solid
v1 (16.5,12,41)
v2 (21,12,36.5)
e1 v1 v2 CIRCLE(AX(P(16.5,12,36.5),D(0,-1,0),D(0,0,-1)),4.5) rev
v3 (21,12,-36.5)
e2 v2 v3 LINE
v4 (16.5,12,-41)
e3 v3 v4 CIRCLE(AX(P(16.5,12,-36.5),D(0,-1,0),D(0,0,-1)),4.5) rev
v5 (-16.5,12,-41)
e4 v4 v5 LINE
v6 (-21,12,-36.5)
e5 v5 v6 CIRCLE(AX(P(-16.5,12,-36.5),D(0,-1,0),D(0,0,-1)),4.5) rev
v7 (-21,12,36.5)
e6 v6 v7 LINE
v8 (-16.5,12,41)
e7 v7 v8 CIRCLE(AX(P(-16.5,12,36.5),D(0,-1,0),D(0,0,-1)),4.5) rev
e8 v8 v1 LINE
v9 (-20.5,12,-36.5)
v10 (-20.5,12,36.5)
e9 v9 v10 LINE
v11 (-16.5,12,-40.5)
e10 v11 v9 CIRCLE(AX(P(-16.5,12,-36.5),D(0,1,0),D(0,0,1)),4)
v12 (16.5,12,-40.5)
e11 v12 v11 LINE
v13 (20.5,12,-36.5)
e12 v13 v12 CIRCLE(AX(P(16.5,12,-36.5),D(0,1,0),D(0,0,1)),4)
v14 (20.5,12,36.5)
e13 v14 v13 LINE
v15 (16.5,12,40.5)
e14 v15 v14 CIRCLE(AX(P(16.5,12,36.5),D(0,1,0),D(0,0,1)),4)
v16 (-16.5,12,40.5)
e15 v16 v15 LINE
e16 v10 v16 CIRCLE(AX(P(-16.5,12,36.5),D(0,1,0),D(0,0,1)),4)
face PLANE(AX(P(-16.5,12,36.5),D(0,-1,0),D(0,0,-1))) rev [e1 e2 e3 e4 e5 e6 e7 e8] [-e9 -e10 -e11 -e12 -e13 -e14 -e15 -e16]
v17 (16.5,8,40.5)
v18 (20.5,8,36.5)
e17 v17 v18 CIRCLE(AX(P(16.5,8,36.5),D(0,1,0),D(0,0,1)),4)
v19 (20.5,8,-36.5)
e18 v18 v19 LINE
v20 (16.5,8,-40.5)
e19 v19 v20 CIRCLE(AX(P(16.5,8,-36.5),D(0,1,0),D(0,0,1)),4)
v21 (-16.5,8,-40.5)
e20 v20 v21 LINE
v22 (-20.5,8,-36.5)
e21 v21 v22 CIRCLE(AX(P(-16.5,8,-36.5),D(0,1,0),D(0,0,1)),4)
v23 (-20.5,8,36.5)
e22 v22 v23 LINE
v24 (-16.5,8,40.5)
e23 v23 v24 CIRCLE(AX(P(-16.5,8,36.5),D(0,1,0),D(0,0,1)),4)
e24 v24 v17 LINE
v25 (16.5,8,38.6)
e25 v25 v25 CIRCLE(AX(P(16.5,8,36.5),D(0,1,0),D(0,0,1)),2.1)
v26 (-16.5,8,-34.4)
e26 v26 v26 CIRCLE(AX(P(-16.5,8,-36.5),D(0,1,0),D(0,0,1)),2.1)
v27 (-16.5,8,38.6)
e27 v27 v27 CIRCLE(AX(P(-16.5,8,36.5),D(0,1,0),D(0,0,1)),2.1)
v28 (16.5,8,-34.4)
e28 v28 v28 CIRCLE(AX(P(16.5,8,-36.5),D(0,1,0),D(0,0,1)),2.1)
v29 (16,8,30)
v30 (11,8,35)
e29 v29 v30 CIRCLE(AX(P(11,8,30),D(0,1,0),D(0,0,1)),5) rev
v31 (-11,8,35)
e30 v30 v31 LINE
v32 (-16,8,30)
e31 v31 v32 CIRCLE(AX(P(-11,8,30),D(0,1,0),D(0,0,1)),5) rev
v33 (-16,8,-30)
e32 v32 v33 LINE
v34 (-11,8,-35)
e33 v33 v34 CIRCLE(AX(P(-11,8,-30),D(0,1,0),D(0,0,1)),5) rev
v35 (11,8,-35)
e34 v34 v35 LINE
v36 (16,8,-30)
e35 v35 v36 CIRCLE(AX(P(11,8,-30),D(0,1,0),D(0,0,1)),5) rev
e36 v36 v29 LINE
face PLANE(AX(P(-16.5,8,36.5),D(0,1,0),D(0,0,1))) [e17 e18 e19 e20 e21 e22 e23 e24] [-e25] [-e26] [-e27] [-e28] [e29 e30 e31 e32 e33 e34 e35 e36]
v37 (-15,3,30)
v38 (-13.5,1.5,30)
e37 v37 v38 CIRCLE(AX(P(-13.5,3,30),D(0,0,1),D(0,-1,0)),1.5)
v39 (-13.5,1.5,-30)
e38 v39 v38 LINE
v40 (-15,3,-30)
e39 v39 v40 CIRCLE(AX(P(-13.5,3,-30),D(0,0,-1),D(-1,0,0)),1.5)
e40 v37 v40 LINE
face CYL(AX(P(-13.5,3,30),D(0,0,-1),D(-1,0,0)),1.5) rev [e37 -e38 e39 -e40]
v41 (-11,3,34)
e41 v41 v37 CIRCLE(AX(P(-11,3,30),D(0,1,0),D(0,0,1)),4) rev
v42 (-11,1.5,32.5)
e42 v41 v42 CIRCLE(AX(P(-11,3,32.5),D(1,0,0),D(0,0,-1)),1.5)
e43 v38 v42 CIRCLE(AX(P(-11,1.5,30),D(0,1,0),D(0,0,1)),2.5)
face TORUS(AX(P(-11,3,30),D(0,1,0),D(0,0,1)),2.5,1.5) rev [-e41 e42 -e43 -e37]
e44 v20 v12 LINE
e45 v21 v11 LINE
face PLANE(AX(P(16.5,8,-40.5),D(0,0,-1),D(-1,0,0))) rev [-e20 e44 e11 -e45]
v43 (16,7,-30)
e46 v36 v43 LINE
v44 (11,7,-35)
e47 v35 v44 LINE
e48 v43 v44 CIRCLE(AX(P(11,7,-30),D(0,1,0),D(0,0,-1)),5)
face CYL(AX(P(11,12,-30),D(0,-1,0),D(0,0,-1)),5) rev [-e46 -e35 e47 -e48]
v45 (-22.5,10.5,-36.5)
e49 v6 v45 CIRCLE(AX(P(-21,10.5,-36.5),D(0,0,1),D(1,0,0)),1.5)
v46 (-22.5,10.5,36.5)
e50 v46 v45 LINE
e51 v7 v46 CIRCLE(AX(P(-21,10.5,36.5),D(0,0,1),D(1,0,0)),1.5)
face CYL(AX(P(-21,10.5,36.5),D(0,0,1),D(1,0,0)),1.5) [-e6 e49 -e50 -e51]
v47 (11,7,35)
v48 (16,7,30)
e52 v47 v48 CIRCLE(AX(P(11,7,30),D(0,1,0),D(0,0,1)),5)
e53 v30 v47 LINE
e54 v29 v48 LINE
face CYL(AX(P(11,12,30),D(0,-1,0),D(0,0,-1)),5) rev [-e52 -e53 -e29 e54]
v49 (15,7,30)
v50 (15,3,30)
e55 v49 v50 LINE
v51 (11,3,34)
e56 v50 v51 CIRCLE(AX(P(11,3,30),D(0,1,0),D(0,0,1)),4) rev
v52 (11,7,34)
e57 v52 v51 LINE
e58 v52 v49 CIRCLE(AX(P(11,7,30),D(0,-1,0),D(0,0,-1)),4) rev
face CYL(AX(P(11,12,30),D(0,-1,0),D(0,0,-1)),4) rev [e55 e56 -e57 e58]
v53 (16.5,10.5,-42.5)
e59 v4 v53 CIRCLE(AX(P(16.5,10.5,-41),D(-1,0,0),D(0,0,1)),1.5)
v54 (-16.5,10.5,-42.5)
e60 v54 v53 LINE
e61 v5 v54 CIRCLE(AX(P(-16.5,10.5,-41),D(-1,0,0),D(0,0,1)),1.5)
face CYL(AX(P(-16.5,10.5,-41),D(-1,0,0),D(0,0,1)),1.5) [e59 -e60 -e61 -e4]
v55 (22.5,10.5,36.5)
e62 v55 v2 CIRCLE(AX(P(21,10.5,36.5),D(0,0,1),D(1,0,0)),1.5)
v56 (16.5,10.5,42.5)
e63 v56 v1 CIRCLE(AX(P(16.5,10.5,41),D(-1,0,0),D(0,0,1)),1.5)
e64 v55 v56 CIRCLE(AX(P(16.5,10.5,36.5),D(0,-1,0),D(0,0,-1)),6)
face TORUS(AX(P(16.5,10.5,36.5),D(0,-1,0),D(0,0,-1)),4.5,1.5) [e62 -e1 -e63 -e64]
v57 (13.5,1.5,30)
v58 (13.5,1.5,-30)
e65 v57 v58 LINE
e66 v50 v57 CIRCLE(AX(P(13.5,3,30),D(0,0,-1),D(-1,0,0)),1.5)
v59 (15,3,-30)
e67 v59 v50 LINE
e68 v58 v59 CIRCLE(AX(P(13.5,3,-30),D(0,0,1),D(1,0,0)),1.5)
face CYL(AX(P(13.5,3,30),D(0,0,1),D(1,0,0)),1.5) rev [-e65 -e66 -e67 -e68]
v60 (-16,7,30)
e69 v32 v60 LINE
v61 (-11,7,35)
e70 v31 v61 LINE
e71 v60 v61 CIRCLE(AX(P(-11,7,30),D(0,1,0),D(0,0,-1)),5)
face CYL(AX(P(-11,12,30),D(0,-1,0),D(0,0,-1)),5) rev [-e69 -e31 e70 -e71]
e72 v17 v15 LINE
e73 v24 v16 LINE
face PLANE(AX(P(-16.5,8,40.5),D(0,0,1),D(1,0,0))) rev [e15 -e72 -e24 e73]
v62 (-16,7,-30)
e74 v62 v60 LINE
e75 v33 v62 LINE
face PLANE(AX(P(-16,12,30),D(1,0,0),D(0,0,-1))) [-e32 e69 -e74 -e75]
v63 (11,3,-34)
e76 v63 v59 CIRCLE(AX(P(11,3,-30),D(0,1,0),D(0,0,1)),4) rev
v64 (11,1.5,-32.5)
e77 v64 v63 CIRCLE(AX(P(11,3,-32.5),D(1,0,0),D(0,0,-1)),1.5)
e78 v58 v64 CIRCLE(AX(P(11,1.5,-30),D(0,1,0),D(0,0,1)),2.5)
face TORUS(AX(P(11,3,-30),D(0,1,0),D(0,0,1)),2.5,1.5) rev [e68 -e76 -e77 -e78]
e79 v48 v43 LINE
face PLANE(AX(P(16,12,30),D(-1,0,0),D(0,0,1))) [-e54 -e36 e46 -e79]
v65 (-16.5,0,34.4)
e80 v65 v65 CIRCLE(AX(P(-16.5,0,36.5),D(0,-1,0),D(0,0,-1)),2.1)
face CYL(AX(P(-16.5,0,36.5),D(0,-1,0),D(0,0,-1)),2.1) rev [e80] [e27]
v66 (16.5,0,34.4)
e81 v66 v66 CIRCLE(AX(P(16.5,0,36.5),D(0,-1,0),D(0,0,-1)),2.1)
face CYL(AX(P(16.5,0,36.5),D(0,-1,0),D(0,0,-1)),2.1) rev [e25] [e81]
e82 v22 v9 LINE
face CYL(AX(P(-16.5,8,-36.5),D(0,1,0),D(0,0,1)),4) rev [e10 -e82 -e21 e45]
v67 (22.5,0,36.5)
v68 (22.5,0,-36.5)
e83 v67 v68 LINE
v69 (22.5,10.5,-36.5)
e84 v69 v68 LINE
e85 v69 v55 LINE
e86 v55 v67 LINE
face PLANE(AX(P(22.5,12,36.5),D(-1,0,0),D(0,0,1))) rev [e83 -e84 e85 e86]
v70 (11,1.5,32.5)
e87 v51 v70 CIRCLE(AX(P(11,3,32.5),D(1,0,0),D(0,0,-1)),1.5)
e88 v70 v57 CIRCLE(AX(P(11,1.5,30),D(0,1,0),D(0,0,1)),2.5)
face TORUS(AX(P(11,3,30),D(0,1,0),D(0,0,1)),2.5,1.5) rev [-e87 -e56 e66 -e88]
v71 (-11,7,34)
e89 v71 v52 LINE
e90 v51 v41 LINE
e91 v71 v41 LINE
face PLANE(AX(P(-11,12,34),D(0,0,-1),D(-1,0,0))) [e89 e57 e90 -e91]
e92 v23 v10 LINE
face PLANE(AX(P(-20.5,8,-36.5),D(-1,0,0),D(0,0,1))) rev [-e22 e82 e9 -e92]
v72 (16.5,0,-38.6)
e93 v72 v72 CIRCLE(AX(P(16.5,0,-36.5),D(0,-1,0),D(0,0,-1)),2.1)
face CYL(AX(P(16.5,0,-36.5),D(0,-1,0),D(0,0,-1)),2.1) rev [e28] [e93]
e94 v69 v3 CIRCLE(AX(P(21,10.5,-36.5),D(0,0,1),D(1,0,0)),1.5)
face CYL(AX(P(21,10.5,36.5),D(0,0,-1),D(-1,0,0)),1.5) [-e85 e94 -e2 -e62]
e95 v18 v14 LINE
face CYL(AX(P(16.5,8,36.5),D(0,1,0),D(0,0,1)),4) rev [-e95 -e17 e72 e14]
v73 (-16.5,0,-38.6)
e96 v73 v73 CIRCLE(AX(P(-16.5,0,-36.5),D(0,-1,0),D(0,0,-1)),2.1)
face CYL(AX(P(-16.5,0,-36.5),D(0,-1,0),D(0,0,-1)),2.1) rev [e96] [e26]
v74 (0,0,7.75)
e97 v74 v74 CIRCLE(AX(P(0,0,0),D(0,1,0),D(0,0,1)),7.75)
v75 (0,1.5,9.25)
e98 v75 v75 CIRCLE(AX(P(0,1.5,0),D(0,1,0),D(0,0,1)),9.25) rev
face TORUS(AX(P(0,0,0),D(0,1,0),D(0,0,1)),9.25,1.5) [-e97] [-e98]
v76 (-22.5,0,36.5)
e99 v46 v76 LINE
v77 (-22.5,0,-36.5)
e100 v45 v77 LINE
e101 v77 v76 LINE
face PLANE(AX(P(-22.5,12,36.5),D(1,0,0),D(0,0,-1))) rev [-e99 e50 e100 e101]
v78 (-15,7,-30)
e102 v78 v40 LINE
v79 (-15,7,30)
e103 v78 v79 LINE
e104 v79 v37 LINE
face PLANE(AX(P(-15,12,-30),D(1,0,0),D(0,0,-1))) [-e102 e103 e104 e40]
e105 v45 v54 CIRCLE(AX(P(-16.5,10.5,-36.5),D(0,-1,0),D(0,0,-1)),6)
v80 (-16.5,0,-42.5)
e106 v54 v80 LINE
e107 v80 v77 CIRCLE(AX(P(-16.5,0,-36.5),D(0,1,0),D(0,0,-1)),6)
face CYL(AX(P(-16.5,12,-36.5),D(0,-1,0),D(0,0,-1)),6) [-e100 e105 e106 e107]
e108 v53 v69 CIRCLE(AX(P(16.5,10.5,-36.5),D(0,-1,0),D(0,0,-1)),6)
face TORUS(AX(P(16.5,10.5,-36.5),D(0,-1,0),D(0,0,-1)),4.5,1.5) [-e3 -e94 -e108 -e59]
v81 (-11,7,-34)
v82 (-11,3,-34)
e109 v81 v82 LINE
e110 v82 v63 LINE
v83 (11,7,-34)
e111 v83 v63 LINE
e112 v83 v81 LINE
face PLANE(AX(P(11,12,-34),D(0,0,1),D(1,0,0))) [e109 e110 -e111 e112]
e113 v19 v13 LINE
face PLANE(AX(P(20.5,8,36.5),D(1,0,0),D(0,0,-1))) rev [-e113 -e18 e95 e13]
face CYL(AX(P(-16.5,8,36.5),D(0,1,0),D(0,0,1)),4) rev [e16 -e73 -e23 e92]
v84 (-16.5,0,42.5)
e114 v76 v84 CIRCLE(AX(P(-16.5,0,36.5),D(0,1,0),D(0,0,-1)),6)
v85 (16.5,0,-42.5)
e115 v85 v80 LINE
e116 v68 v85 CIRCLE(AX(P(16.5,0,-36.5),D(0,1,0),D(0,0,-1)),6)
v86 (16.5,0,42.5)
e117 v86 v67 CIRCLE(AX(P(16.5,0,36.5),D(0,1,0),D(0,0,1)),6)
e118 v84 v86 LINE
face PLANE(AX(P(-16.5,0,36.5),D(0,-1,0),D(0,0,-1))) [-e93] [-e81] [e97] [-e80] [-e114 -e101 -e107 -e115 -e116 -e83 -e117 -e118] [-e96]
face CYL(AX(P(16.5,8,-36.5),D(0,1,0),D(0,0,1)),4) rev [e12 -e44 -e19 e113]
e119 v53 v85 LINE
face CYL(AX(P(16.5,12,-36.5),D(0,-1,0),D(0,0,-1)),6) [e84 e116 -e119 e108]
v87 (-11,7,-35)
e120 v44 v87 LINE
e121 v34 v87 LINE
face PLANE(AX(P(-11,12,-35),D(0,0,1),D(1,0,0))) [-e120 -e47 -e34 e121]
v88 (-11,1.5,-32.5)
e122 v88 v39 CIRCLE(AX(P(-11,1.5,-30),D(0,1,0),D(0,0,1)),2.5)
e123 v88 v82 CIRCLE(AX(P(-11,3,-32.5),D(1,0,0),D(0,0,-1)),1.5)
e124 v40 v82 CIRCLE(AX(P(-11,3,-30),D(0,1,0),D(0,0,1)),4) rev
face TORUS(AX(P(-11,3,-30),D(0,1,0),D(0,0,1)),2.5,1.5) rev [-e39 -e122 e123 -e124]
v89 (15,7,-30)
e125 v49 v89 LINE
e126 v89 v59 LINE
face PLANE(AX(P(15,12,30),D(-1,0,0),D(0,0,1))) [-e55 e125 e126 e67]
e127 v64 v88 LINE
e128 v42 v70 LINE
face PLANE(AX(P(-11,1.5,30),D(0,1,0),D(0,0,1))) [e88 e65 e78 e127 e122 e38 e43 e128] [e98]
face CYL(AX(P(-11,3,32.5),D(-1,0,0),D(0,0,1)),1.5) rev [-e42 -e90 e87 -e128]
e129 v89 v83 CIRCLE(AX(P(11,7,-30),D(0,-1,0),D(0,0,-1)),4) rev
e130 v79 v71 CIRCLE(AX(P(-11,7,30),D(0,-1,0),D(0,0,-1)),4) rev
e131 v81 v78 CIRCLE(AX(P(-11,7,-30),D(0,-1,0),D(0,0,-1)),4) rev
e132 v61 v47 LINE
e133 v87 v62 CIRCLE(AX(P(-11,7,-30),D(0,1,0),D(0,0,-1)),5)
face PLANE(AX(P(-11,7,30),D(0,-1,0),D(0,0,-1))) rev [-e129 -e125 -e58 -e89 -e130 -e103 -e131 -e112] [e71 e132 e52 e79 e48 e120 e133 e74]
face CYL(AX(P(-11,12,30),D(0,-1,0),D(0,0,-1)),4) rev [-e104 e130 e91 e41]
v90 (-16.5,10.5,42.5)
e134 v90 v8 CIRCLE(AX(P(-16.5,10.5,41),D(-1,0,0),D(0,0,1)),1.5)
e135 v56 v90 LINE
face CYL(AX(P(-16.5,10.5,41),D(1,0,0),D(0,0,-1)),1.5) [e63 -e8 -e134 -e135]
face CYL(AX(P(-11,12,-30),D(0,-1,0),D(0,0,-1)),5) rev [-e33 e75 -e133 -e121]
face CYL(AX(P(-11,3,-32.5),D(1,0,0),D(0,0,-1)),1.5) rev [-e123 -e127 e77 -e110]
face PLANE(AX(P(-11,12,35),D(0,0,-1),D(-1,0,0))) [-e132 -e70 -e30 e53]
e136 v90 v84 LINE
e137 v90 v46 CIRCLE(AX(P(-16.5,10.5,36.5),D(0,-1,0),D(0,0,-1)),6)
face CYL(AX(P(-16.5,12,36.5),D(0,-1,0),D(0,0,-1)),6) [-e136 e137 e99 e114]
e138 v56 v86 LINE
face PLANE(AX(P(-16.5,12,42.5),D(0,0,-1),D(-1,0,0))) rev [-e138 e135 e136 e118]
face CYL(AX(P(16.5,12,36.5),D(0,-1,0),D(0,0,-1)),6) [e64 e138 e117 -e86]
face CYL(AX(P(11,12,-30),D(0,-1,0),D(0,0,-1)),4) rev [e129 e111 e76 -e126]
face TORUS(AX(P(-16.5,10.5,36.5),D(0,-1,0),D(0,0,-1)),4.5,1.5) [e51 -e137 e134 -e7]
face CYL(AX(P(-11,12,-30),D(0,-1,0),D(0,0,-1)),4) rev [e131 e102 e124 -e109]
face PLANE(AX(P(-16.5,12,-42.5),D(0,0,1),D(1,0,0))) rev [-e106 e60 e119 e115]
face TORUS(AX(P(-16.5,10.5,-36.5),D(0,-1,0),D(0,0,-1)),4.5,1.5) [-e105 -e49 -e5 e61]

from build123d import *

# Parameters (mm, degrees)
BOSS_EXTRUDE1_DEPTH        = 12
CUT_EXTRUDE1_DEPTH         = 4
SKETCH3_R                  = 7.75
CUT_EXTRUDE2_DEPTH         = 50.563091106
CUT_EXTRUDE3_DEPTH         = 49.595267259
CUT_EXTRUDE4_DEPTH         = 50.221438419
F_4_2_4_2_DIAMETER_HOLE1_D = 4.2
FILLET1_R                  = 1.5
FILLET2_R                  = 1.5


with BuildPart() as part:
    # Sketch1 → Boss-Extrude1 (new body)
    with BuildSketch(Plane(origin=(0, 0, 0), x_dir=(1, 0, 0), z_dir=(0, 1, 0))):
        with BuildLine():
            Line((-16.5, -42.5), (16.5, -42.5))
            ThreePointArc((16.5, -42.5), (20.742640687, -40.742640687), (22.5, -36.5))
            Line((22.5, -36.5), (22.5, 36.5))
            ThreePointArc((22.5, 36.5), (20.742640687, 40.742640687), (16.5, 42.5))
            Line((16.5, 42.5), (-16.5, 42.5))
            ThreePointArc((-16.5, 42.5), (-20.742640687, 40.742640687), (-22.5, 36.5))
            Line((-22.5, 36.5), (-22.5, -36.5))
            ThreePointArc((-22.5, -36.5), (-20.742640687, -40.742640687), (-16.5, -42.5))
        make_face()
    extrude(amount=BOSS_EXTRUDE1_DEPTH)

    # Sketch2 → Cut-Extrude1 (cut)
    with BuildSketch(Plane(origin=(0, 12, 0), x_dir=(1, 0, 0), z_dir=(0, 1, 0))):
        with BuildLine():
            Line((-16.5, -40.5), (16.5, -40.5))
            ThreePointArc((16.5, -40.5), (19.328427125, -39.328427125), (20.5, -36.5))
            Line((20.5, -36.5), (20.5, 36.5))
            ThreePointArc((20.5, 36.5), (19.328427125, 39.328427125), (16.5, 40.5))
            Line((16.5, 40.5), (-16.5, 40.5))
            ThreePointArc((-16.5, 40.5), (-19.328427125, 39.328427125), (-20.5, 36.5))
            Line((-20.5, 36.5), (-20.5, -36.5))
            ThreePointArc((-20.5, -36.5), (-19.328427125, -39.328427125), (-16.5, -40.5))
        make_face()
    extrude(amount=-CUT_EXTRUDE1_DEPTH, mode=Mode.SUBTRACT)

    # Sketch3 → Cut-Extrude2 (cut, through all)
    with BuildSketch(Plane(origin=(0, 0, 0), x_dir=(1, 0, 0), z_dir=(0, 1, 0))):
        with Locations(Location((0, 0, 0), (0, 0, 270))):
            Circle(SKETCH3_R)
    extrude(amount=CUT_EXTRUDE2_DEPTH, mode=Mode.SUBTRACT)

    # Sketch4 → Cut-Extrude3 (cut, through all)
    with BuildSketch(Plane(origin=(0, 7, 0), x_dir=(1, 0, 0), z_dir=(0, 1, 0))):
        with BuildLine():
            Line((-16, -30), (-16, 30))
            ThreePointArc((-16, 30), (-14.535533906, 33.535533906), (-11, 35))
            Line((-11, 35), (11, 35))
            ThreePointArc((11, 35), (14.535533906, 33.535533906), (16, 30))
            Line((16, 30), (16, -30))
            ThreePointArc((16, -30), (14.535533906, -33.535533906), (11, -35))
            Line((11, -35), (-11, -35))
            ThreePointArc((-11, -35), (-14.535533906, -33.535533906), (-16, -30))
        make_face()
    extrude(amount=CUT_EXTRUDE3_DEPTH, mode=Mode.SUBTRACT)

    # Sketch6 → Cut-Extrude4 (cut, through all)
    with BuildSketch(Plane(origin=(0, 1.5, 0), x_dir=(1, 0, 0), z_dir=(0, 1, 0))):
        with BuildLine():
            Line((-11, -34), (11, -34))
            ThreePointArc((11, -34), (13.828427125, -32.828427125), (15, -30))
            Line((15, -30), (15, 30))
            ThreePointArc((15, 30), (13.828427125, 32.828427125), (11, 34))
            Line((11, 34), (-11, 34))
            ThreePointArc((-11, 34), (-13.828427125, 32.828427125), (-15, 30))
            Line((-15, 30), (-15, -30))
            ThreePointArc((-15, -30), (-13.828427125, -32.828427125), (-11, -34))
        make_face()
    extrude(amount=CUT_EXTRUDE4_DEPTH, mode=Mode.SUBTRACT)

    # Ø4.2 (4.2) Diameter Hole1 (through all)
    with Locations(Plane.XZ):
        with Locations((-16.5, 36.5), (16.5, 36.5), (16.5, -36.5), (-16.5, -36.5)):
            Hole(F_4_2_4_2_DIAMETER_HOLE1_D / 2)

    # Fillet1
    fillet1_edges = [part.edges().sort_by_distance(p)[0] for p in [
        (20.742640687, 12, 40.742640687),
        (22.5, 12, 0),
        (20.742640687, 12, -40.742640687),
        (0, 12, -42.5),
        (-20.742640687, 12, -40.742640687),
        (-22.5, 12, 0),
        (-20.742640687, 12, 40.742640687),
        (0, 12, 42.5),
    ]]
    fillet(fillet1_edges, radius=FILLET1_R)

    # Fillet2
    fillet2_edges = [part.edges().sort_by_distance(p)[0] for p in [
        (0, 1.5, -7.75),
        (-13.828427125, 1.5, 32.828427125),
        (0, 1.5, 34),
        (13.828427125, 1.5, 32.828427125),
        (15, 1.5, 0),
        (13.828427125, 1.5, -32.828427125),
        (0, 1.5, -34),
        (-13.828427125, 1.5, -32.828427125),
        (-15, 1.5, 0),
    ]]
    fillet(fillet2_edges, radius=FILLET2_R - 0.0001)  # a hair under: the kernel refuses the full size


solid = part.part
